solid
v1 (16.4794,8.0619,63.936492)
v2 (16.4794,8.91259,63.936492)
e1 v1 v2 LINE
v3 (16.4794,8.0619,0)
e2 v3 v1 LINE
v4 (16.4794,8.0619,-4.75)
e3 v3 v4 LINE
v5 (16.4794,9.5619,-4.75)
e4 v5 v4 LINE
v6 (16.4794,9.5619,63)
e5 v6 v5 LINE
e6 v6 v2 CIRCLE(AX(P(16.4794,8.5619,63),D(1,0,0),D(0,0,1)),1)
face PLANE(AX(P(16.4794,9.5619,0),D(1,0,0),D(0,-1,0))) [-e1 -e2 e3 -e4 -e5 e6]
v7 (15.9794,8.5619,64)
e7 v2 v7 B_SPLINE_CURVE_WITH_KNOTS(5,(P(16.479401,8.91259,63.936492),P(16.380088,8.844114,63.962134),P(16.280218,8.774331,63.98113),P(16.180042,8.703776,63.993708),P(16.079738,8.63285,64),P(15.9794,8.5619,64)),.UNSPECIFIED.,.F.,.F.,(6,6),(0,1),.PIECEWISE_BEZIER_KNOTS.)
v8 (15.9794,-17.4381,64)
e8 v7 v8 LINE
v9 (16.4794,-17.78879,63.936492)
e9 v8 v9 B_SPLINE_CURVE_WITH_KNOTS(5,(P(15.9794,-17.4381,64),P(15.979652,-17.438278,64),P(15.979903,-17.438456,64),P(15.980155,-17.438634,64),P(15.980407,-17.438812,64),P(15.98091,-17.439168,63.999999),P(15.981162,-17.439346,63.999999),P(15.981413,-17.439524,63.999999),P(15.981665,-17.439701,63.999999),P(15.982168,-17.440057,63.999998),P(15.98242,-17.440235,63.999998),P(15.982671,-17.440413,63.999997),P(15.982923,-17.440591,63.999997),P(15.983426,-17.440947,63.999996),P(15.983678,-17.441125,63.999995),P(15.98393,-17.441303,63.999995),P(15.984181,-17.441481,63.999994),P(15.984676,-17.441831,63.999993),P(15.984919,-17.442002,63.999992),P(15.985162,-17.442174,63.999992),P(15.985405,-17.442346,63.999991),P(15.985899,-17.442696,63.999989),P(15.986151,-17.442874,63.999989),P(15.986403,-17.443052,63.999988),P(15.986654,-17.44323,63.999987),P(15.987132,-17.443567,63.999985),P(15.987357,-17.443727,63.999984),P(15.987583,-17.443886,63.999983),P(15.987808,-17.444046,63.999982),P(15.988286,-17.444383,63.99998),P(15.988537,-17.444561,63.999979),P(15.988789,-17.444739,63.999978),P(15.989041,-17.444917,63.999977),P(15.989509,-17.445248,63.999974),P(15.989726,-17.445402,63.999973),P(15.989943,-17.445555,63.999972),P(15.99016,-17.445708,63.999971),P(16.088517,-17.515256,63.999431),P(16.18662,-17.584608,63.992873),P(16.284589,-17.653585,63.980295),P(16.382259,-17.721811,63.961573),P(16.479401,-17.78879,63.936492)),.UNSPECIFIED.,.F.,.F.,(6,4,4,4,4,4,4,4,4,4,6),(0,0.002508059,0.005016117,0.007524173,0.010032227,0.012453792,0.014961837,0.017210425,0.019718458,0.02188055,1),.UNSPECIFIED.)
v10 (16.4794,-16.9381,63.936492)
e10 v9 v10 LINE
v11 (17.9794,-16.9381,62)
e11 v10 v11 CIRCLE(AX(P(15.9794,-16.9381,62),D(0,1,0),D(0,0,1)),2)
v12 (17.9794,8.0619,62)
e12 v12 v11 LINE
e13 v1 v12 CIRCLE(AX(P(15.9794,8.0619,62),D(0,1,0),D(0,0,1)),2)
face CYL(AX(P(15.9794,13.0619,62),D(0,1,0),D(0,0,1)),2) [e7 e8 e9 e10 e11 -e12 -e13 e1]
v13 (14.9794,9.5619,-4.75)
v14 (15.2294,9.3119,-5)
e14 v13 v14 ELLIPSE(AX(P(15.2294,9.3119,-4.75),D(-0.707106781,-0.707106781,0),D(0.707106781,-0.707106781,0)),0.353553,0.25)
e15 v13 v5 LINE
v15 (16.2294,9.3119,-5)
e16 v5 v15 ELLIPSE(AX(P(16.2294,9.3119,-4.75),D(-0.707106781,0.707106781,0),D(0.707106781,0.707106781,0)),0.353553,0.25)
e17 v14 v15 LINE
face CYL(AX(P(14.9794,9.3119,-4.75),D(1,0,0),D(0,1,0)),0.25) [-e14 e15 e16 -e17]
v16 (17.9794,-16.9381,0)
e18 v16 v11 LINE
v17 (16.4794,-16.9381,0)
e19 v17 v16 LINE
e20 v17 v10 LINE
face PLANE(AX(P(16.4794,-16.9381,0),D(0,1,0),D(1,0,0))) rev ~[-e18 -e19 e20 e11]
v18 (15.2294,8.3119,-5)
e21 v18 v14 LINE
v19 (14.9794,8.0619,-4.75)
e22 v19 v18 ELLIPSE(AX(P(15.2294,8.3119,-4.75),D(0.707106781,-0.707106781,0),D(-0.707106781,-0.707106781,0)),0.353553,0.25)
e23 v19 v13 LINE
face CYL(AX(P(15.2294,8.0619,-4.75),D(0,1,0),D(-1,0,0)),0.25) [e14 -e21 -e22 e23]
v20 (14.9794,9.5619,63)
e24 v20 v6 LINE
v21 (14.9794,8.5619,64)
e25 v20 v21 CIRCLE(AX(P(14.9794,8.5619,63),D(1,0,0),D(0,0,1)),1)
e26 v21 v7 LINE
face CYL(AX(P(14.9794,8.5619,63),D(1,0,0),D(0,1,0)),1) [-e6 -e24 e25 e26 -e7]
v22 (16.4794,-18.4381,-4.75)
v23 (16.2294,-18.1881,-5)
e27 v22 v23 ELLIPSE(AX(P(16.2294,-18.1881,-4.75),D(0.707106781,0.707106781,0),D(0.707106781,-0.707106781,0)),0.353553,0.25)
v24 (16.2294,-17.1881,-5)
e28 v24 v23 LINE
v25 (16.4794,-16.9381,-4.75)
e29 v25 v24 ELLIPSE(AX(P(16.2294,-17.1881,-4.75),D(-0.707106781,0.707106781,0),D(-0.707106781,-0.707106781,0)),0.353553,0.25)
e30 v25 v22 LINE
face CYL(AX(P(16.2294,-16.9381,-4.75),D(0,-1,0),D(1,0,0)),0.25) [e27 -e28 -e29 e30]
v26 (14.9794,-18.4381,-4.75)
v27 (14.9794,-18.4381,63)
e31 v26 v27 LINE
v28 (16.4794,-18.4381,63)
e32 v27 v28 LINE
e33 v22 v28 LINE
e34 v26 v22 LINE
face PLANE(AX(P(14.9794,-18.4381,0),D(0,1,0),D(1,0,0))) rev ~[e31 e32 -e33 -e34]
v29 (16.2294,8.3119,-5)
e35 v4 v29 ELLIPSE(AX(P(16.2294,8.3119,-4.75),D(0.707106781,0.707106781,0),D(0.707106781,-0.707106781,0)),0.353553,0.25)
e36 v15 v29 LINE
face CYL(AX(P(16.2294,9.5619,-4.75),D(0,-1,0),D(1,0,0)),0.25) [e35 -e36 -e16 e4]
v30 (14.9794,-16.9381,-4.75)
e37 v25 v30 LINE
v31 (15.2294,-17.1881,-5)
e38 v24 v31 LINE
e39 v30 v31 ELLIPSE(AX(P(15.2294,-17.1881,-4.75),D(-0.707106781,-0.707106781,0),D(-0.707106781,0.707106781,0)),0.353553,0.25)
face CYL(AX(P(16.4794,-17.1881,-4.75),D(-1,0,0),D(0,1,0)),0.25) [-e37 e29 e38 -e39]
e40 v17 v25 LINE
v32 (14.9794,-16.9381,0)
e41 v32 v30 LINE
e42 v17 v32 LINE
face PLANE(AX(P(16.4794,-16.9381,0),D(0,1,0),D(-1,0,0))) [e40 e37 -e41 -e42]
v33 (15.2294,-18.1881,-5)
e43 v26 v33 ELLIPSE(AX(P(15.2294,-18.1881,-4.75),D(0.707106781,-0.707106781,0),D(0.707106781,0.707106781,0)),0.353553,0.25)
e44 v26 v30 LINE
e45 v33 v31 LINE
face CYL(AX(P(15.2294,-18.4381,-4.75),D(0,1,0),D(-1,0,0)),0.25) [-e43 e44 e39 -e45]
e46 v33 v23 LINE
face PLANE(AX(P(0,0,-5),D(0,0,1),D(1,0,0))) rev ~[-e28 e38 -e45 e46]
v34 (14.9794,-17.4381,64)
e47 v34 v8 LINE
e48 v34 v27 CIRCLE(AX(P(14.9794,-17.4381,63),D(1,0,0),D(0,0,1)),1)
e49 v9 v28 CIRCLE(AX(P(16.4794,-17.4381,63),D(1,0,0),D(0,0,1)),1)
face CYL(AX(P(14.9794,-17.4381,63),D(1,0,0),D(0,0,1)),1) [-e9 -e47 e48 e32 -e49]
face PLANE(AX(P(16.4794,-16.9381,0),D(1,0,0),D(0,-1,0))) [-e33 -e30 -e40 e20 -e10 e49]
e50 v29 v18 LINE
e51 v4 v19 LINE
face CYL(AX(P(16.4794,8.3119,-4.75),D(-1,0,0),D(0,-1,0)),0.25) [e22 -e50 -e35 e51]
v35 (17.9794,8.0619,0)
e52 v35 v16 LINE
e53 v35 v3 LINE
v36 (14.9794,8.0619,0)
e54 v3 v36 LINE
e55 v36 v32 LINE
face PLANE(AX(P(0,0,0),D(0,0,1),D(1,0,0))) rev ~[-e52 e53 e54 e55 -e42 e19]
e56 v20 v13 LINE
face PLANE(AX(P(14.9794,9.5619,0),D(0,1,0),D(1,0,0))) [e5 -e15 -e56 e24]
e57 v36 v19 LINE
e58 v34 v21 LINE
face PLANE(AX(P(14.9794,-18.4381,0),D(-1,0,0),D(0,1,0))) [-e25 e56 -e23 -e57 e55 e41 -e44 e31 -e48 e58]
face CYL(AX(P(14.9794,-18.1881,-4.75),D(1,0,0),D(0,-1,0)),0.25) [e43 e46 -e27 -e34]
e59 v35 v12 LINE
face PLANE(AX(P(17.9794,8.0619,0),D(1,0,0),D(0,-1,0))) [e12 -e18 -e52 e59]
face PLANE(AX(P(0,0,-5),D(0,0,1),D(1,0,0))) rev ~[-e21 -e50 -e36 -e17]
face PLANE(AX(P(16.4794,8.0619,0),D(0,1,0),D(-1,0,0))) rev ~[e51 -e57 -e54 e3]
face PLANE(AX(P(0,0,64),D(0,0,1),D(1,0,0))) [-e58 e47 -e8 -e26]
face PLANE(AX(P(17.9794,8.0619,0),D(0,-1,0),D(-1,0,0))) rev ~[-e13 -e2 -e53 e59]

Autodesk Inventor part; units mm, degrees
ref_plane "YZ Plane" through (0, 0, 0) normal (1, 0, 0) x (0, 1, 0)
ref_plane "XZ Plane" through (0, 0, 0) normal (0, 1, 0) x (-1, 0, 0)
ref_plane "XY Plane" through (0, 0, 0) normal (0, 0, 1) x (1, 0, 0)
sketch "Sketch1" plane through (0, 0, 0) normal (0, 0, 1) x (1, 0, 0)
  line L0 (14.9794, -18.4381) -> (14.9794, 9.5619)
  line L1 (16.4794, -16.9381) -> (17.9794, -16.9381)
  line L2 (17.9794, 8.0619) -> (16.4794, 8.0619)
  line L3 (16.4794, 9.5619) -> (16.4794, 8.0619)
  line L4 (16.4794, -16.9381) -> (16.4794, -18.4381)
  line L5 (14.9794, 9.5619) -> (16.4794, 9.5619)
  line L6 (14.9794, -18.4381) -> (16.4794, -18.4381)
  line L7 (16.4794, -16.9381) -> (14.9794, -16.9381)
  line L8 (16.4794, 8.0619) -> (14.9794, 8.0619)
  line L9 (17.9794, 8.0619) -> (17.9794, -16.9381)
  dimension "d3" = 28
  dimension "d4" = 1.5
  dimension "d5" = 1.5
  dimension "d9" = 1.5
  dimension "d10" = 1.5
  dimension "d11" = 3
  dimension "d12" = 1.5
  dimension "d13" = 1.5
extrude "Extrusion1" add sketch "Sketch1" along normal blind 64
extrude "Extrusion2" add sketch "Sketch1" against normal blind 5 contours L0 L7 L4 L6 | L0 L5 L3 L8
fillet "Fillet1" radius 0.25 8 edges at (15.7294, 9.5619, -5) (16.4794, 8.8119, -5) (15.7294, 8.0619, -5) (14.9794, 8.8119, -5) (16.4794, -17.6881, -5) (15.7294, -16.9381, -5) (14.9794, -17.6881, -5) (15.7294, -18.4381, -5)
fillet "Fillet2" radius 1 2 edges at (15.7294, 9.5619, 64) (15.7294, -18.4381, 64)
fillet "Fillet3" radius 2 1 edges at (17.9794, -4.4381, 64)
properties part number "cover"
